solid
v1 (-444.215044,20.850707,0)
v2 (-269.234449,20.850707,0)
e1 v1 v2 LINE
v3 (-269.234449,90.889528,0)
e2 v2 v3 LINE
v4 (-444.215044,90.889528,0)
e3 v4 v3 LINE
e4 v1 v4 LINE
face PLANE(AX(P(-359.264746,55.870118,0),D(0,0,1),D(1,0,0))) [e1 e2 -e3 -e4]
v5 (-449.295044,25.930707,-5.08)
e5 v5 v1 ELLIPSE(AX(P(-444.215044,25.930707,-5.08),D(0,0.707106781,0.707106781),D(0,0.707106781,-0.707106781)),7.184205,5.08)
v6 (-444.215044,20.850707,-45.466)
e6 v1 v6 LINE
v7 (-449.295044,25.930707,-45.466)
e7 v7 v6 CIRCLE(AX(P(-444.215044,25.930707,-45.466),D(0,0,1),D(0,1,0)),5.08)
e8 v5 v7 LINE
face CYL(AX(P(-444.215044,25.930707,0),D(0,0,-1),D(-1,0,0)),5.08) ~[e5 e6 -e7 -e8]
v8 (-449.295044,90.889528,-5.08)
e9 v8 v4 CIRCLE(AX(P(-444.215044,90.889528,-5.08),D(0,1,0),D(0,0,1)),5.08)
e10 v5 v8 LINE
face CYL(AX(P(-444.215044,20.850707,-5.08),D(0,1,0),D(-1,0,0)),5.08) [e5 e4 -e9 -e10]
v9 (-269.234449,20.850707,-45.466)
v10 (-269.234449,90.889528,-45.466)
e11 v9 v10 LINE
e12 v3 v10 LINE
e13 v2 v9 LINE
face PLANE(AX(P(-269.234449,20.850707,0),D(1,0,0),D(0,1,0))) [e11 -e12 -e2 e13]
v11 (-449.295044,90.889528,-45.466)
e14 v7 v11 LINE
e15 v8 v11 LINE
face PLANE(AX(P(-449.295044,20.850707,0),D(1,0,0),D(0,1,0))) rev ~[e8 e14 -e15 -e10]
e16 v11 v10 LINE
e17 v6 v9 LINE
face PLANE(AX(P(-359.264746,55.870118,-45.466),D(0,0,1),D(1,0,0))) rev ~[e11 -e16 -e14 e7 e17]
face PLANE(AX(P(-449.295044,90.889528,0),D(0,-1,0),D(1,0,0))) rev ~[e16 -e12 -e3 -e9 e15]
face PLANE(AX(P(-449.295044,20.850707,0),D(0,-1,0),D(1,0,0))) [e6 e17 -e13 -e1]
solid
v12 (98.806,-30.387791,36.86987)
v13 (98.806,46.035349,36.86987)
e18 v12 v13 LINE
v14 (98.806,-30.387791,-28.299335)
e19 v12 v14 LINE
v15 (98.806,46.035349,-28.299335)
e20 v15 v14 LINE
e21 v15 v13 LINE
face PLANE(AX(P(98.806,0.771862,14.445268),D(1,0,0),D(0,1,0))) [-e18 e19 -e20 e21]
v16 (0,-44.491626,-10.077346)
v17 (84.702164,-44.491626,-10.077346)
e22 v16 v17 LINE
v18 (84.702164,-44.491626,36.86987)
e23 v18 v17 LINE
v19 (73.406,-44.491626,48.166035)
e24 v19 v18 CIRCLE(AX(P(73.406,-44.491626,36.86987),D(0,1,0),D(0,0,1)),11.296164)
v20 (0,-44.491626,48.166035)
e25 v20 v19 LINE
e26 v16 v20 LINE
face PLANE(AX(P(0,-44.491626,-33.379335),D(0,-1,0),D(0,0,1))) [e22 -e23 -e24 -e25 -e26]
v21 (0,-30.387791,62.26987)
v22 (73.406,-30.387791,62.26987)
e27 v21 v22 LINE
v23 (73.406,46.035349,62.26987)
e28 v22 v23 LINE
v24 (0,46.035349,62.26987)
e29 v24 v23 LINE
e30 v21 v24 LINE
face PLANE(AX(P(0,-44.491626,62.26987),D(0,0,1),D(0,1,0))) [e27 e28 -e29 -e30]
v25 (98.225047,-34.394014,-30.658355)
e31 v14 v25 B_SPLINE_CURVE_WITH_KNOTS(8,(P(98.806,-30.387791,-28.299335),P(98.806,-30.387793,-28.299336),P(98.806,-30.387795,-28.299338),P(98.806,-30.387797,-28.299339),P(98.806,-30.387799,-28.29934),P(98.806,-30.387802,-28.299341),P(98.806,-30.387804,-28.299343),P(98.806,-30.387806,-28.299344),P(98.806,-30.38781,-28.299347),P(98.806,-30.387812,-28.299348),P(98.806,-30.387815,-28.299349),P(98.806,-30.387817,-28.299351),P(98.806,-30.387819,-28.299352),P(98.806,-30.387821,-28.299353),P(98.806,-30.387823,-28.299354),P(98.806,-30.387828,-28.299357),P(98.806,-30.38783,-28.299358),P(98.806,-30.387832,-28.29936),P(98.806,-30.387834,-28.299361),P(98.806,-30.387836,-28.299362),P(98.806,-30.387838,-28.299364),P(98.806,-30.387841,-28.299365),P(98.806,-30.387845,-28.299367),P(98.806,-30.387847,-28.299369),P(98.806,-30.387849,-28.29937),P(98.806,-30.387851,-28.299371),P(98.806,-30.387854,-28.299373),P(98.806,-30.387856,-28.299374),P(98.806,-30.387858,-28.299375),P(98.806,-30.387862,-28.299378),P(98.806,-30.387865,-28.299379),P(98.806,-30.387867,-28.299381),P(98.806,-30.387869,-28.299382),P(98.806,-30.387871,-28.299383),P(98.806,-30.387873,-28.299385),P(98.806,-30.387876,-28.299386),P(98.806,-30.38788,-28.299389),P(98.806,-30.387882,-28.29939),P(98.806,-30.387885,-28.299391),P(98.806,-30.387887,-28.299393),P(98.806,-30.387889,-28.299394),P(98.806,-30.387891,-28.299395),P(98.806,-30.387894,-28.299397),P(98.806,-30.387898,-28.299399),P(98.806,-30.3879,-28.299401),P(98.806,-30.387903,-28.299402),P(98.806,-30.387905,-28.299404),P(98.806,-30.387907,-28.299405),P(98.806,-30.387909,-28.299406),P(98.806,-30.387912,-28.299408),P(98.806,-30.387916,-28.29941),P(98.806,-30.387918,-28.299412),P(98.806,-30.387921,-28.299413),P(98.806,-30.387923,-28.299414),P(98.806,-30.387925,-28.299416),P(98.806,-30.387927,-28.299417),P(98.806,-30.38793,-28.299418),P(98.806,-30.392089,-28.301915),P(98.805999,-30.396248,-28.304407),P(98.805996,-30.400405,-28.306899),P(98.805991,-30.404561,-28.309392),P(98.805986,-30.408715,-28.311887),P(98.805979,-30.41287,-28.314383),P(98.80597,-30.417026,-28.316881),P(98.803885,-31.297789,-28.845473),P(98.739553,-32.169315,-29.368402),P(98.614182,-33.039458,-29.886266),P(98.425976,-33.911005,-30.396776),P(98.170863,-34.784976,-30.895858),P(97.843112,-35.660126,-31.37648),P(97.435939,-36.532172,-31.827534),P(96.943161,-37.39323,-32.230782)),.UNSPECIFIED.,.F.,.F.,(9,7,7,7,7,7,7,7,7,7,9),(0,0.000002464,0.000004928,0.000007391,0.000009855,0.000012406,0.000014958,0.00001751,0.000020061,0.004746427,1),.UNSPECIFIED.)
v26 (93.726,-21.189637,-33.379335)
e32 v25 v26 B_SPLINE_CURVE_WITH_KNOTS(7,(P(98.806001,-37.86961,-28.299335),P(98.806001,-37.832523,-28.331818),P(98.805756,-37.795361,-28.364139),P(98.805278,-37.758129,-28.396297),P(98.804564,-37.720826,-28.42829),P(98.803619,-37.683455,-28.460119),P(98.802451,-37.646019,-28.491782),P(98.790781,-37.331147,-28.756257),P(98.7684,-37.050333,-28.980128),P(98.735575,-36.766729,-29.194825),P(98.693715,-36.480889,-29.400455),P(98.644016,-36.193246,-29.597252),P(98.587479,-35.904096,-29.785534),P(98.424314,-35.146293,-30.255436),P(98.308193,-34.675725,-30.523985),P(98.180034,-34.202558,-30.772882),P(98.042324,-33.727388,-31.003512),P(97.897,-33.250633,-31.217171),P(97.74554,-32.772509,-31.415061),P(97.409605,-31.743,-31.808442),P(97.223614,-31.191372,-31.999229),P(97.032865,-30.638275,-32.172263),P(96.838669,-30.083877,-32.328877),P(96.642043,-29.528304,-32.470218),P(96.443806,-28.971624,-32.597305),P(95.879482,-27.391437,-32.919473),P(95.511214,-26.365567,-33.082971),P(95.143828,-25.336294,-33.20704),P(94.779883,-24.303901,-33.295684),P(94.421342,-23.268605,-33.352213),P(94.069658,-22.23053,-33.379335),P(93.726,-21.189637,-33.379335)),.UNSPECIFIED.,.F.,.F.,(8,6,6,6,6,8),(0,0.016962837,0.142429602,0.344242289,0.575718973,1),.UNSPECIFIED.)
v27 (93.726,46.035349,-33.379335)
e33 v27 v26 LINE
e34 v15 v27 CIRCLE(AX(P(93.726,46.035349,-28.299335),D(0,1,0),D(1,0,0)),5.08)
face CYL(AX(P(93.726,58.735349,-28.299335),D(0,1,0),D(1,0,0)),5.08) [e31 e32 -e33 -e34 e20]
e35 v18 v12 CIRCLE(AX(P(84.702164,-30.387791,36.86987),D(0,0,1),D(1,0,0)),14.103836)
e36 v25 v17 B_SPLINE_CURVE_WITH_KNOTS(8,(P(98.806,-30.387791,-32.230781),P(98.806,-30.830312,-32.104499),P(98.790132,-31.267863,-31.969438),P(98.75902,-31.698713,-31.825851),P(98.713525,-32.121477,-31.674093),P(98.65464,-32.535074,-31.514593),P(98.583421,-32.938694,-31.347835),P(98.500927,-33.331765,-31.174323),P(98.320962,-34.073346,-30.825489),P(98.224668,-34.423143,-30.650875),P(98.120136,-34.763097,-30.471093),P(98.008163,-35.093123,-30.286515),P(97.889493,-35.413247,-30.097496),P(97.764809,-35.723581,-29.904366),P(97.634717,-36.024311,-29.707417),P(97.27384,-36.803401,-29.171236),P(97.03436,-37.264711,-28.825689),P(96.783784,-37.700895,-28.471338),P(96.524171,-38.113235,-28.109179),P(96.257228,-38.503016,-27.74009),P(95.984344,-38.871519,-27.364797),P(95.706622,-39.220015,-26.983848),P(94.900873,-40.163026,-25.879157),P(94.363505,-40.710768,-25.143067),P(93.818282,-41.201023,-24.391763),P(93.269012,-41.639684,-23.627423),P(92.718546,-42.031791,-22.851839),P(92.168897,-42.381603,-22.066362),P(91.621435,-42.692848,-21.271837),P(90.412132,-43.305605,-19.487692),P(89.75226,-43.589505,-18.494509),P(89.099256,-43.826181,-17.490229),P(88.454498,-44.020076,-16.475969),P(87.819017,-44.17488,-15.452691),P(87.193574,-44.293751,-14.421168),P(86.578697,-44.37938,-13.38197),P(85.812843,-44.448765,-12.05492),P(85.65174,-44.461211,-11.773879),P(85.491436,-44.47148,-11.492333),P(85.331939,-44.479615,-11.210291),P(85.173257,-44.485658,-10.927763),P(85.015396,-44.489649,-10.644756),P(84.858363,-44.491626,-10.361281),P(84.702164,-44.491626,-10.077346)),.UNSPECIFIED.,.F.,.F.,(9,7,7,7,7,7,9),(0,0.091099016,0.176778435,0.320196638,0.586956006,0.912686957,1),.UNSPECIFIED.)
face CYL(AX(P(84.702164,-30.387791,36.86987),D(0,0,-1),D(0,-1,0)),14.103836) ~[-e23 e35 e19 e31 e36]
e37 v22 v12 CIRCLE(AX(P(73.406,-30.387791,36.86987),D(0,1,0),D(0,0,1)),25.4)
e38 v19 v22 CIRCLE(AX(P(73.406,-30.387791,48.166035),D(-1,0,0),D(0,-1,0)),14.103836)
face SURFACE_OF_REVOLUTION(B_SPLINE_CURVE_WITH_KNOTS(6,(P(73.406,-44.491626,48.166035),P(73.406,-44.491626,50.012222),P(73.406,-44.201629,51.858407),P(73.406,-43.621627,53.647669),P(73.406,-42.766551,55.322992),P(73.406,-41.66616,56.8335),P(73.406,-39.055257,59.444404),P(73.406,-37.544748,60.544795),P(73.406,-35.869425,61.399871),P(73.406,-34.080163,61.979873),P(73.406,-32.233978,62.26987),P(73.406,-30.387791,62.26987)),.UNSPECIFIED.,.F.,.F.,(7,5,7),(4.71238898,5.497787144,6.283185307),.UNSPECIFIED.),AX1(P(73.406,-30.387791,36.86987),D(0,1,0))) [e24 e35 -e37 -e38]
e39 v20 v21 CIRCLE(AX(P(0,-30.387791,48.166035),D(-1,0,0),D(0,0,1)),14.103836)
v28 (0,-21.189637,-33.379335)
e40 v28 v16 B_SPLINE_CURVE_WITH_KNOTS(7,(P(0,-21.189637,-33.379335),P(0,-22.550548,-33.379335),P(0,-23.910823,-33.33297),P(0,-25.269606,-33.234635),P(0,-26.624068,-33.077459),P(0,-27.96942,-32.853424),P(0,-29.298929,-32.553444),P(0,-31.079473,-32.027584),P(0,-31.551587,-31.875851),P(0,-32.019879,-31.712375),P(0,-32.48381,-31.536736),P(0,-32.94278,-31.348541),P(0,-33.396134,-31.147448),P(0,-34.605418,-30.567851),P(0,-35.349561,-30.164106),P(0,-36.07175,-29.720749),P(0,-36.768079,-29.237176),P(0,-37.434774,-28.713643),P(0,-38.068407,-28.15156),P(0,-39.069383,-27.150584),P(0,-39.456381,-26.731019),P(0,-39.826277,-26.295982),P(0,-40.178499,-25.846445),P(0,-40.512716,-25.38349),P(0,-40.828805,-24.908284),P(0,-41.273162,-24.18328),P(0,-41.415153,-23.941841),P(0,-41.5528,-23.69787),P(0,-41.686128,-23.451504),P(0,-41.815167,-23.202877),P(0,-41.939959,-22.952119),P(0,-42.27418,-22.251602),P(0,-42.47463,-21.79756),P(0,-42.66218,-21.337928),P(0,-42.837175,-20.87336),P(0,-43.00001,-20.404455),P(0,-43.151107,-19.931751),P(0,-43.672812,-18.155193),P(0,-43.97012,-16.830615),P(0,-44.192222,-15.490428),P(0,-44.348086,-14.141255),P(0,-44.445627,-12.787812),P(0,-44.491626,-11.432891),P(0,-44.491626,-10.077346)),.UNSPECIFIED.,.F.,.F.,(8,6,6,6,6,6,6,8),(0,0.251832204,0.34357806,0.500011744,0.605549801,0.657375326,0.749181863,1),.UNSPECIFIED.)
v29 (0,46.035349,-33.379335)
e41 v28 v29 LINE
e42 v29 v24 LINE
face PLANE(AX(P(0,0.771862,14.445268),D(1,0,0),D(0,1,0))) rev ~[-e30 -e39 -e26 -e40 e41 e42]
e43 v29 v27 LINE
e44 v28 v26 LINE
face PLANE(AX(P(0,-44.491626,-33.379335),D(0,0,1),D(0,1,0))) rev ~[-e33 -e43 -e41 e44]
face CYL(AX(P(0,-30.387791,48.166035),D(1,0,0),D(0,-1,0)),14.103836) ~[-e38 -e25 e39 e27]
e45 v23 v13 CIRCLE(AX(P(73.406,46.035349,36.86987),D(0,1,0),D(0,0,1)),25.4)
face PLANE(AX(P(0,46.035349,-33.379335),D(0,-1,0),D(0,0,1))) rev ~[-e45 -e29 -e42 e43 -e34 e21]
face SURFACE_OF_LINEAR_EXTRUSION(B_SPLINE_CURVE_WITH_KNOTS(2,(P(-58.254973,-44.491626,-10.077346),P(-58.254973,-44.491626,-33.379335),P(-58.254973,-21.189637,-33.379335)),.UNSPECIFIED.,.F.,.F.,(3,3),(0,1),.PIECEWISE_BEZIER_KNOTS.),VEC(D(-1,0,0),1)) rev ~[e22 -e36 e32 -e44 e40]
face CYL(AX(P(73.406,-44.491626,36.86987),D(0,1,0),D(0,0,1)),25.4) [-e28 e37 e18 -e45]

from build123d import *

# Parameters (mm, degrees)
F0_W        = 90.5269756913
F0_H        = 95.6492051482
F1_DEPTH    = 98.806
F2_R        = 25.4
F3_R        = 14.1038356314
F4_T1_DEPTH = 201.2121108887
F5_T1_DEPTH = 101.5149863872
F6_W        = 180.060595274
F6_H        = 70.0388215482
F7_DEPTH    = 45.466
F8_R        = 5.08


# Not quite as in the source:
# - a fillet or chamfer that OpenCascade refuses, or shapes differently, is made with other operations: its cross-section is extruded or revolved along the edge and cut away or added


with BuildPart() as f1:
    # F0 (on Right) → F1 (new body)
    with BuildSketch(Plane.YZ):
        with Locations((0.7718615234, 14.4452676177)):
            Rectangle(F0_W, F0_H)
    extrude(amount=F1_DEPTH)

    # F2
    f2_edges = [f1.edges().sort_by_distance(p)[0] for p in [
        (98.806, 0.771862, 62.26987),
    ]]
    fillet(f2_edges, radius=F2_R)

    # F3
    f3_edges = [f1.edges().sort_by_distance(p)[0] for p in [
        (36.703, -44.491626, 62.26987),
        (91.366512, -44.491626, 54.830382),
        (98.806, -44.491626, 1.745268),
    ]]
    fillet(f3_edges, radius=F3_R)

    # F4: fillet of radius 23.301989304 on 1 edges, made by hand

    # F4_s2 → F4_t1 (cut)
    with BuildSketch(Plane.YZ.offset(-58.2549732601)):
        with BuildLine():
            add(Edge.make_bspline(
                [(-44.4916263223, -10.0773456524), (-44.4916263223, -33.3793349564), (-21.1896370182, -33.3793349564)],
                knots=[0, 0, 0, 1, 1, 1], degree=2, weights=[1, 1, 1]))
            Line((-21.1896370182, -33.3793349564), (-44.4916263223, -33.3793349564))
            Line((-44.4916263223, -33.3793349564), (-44.4916263223, -10.0773456524))
        make_face()
    extrude(amount=F4_T1_DEPTH, mode=Mode.SUBTRACT)

    # F5: fillet of radius 5.08 on 1 edges, made by hand

    # F5_s2 → F5_t1 (cut)
    with BuildSketch(Plane.XZ.offset(-58.735349369)):
        with BuildLine():
            ThreePointArc((98.806, -28.2993349564), (97.3181024484, -31.8914374048), (93.726, -33.3793349564))
            Line((93.726, -33.3793349564), (98.806, -33.3793349564))
            Line((98.806, -33.3793349564), (98.806, -28.2993349564))
        make_face()
    extrude(amount=F5_T1_DEPTH, mode=Mode.SUBTRACT)


with BuildPart() as f7:
    # F6 (on Top) → F7 (new body)
    with BuildSketch(Plane.XY):
        with Locations((-359.2647463083, 55.8701176196)):
            Rectangle(F6_W, F6_H)
    extrude(amount=-F7_DEPTH)

    # F8
    f8_edges = [f7.edges().sort_by_distance(p)[0] for p in [
        (-449.295044, 55.870118, 0),
        (-449.295044, 20.850707, -22.733),
    ]]
    fillet(f8_edges, radius=F8_R)


solid = Compound([f1.part, f7.part])
